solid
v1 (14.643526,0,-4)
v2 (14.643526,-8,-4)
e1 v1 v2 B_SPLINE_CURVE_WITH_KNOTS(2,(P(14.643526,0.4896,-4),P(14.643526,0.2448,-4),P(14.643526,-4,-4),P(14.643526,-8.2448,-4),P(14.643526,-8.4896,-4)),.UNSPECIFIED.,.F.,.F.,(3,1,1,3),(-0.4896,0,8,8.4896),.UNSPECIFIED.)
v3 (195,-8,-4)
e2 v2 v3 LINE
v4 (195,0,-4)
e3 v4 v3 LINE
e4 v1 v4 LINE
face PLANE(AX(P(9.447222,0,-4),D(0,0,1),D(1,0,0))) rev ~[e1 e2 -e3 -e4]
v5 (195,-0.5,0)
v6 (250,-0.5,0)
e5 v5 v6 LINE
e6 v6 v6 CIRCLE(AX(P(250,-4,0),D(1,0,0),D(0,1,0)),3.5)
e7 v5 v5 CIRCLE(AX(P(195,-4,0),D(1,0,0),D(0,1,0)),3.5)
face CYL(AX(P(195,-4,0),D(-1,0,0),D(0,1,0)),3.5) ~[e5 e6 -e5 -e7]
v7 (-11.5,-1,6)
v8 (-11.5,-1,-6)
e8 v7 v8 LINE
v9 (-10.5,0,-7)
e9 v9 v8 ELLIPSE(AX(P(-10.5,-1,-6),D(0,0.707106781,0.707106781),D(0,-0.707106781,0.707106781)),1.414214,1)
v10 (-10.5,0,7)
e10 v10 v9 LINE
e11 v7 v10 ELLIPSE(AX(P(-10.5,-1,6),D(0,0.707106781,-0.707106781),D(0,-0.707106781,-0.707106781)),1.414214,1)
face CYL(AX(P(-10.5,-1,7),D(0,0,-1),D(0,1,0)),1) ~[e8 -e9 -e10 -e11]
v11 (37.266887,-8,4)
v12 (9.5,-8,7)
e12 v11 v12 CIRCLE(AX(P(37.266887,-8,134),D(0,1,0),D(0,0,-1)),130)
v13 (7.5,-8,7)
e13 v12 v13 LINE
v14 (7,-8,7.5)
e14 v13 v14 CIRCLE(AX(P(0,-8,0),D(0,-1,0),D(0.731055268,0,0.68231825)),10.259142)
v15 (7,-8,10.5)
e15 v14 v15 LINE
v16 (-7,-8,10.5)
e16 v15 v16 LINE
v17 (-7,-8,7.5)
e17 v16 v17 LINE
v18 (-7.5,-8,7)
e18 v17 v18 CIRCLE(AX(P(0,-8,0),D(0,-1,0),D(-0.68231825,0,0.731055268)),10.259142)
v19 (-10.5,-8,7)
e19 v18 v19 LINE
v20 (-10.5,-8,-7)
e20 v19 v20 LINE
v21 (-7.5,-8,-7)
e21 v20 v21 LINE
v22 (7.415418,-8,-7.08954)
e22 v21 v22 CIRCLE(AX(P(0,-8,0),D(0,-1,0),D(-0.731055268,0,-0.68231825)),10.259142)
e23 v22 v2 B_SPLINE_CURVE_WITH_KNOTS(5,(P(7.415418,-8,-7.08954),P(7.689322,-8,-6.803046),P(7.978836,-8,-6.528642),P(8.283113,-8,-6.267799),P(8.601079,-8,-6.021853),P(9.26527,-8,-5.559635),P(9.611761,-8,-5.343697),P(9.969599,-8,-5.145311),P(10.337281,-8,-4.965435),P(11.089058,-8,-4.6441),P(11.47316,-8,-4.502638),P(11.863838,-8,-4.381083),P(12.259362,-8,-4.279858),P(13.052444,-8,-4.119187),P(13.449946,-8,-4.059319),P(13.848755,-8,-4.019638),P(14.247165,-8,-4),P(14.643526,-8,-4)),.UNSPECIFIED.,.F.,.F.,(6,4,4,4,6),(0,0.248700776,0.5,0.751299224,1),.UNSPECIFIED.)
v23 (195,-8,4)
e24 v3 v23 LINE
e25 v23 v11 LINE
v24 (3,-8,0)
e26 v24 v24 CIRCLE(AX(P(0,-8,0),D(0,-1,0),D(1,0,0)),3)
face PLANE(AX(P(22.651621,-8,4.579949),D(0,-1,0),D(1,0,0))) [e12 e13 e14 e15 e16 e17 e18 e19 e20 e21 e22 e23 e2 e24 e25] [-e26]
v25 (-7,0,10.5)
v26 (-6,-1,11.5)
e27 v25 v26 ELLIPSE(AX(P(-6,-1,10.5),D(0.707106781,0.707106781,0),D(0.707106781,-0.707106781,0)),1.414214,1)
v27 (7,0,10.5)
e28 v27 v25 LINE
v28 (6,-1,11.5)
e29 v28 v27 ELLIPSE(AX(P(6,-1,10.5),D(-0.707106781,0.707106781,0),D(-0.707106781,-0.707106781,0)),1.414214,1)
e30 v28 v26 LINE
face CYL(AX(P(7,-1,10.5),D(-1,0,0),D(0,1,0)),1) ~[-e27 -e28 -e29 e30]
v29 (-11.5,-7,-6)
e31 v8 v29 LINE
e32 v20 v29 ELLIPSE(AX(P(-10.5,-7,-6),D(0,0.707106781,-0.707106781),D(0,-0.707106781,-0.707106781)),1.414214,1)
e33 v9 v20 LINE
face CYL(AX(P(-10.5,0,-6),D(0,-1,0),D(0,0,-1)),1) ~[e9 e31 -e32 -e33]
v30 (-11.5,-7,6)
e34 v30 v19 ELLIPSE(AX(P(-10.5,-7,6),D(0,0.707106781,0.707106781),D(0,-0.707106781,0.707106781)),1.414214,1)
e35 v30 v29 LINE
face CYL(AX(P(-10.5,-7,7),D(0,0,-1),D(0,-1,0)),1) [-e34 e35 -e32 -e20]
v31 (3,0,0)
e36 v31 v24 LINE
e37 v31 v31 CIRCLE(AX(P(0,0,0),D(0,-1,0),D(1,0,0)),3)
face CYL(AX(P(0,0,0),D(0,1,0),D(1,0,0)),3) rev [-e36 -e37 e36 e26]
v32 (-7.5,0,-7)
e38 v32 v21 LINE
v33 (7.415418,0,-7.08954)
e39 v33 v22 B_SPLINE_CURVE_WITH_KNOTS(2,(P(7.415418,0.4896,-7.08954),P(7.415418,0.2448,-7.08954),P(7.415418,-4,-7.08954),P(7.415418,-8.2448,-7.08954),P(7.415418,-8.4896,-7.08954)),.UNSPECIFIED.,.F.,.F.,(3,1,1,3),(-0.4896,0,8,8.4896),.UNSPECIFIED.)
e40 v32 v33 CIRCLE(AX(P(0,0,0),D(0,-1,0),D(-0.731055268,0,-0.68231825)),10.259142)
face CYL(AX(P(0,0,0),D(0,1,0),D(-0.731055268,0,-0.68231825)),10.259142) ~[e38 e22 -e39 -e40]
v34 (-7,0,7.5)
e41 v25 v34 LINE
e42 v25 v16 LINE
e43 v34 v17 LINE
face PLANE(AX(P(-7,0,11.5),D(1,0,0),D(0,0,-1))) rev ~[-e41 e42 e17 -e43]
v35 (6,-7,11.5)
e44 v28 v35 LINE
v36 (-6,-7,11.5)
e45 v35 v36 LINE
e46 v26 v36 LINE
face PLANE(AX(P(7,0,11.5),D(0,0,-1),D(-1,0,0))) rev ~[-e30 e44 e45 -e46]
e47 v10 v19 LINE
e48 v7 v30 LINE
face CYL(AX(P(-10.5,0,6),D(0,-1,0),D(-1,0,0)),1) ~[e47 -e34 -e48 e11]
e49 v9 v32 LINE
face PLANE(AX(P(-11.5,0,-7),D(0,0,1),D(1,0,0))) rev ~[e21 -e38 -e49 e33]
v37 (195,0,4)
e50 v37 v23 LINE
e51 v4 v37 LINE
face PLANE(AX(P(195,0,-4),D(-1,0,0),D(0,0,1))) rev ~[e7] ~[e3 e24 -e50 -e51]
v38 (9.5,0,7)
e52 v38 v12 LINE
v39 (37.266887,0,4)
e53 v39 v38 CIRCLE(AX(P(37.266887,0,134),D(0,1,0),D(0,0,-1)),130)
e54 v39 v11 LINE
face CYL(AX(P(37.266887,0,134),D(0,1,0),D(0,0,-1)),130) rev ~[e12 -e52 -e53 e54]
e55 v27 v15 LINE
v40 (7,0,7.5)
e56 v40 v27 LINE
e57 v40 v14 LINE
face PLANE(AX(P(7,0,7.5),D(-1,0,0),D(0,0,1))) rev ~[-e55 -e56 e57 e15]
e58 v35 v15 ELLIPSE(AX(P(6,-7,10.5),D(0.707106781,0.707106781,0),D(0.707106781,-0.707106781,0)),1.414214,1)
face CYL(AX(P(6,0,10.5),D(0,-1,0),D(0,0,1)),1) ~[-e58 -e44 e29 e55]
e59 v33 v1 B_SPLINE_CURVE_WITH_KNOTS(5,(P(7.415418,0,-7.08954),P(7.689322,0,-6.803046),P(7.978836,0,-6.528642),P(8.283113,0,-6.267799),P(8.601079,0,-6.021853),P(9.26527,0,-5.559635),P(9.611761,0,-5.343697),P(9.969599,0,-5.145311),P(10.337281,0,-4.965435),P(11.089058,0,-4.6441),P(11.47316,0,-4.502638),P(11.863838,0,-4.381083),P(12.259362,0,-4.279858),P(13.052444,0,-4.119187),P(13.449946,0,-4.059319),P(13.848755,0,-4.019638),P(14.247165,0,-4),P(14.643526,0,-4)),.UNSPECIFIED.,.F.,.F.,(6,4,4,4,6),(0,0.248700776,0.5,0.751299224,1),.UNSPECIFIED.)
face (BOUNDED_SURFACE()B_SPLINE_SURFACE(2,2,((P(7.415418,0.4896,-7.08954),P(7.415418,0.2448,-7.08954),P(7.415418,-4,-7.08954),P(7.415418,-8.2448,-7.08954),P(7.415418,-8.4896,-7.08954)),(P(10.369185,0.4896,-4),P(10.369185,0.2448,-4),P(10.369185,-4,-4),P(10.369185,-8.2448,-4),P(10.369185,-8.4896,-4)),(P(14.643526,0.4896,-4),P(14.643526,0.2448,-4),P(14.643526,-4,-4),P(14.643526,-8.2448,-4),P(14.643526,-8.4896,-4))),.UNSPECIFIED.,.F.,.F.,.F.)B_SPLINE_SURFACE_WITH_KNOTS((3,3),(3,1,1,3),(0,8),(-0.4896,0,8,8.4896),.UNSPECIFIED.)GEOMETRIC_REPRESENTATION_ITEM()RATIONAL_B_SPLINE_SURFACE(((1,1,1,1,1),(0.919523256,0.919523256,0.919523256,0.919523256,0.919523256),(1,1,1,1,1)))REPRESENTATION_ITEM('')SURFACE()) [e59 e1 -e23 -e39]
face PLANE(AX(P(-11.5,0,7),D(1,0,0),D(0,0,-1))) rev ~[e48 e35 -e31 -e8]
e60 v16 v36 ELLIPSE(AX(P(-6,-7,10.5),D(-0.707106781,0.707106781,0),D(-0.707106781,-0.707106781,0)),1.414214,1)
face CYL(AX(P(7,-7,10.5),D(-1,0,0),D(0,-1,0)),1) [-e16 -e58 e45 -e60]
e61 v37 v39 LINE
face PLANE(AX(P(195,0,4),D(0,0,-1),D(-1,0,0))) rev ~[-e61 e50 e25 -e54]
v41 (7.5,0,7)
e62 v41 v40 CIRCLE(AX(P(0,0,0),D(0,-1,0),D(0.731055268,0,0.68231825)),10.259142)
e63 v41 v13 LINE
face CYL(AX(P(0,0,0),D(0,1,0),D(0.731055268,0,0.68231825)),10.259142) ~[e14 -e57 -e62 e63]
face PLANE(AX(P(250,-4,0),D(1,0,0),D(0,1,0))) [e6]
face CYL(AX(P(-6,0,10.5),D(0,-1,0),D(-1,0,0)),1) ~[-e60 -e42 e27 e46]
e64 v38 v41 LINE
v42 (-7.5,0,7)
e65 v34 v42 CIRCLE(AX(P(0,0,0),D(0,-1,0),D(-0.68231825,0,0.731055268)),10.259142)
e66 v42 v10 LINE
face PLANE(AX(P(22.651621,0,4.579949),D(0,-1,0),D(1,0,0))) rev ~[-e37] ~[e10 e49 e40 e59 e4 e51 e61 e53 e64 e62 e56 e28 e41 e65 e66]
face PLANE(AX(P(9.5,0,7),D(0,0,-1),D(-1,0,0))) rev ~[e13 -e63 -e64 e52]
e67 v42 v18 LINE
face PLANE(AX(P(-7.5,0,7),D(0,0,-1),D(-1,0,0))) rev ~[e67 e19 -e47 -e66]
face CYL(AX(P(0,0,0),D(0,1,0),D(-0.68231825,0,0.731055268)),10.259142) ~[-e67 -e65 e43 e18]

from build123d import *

# Parameters (mm, degrees)
F0_R        = 3
F1_DEPTH    = 8
F2_R        = 10
F3_T1_DEPTH = 8
F4_R        = 1
F5_R        = 3.5
F6_DEPTH    = 55


# Not quite as in the source:
# - a fillet or chamfer that OpenCascade refuses, or shapes differently, is made with other operations: its cross-section is extruded or revolved along the edge and cut away or added


with BuildPart() as f1:
    # F0 (on Front) → F1 (new body)
    with BuildSketch(Plane.XZ):
        with BuildLine():
            Line((-7.5, 7), (-11.5, 7))
            Line((-11.5, 7), (-11.5, -7))
            Line((-11.5, -7), (-7.5, -7))
            ThreePointArc((-7.5, -7), (0, -10.2591422643), (7.5, -7))
            ThreePointArc((7.5, -7), (8.6053519278, -5.5855096632), (9.4472218138, -4))
            Line((9.4472218138, -4), (9.5, -4))
            Line((9.5, -4), (195, -4))
            Line((195, -4), (195, 4))
            Line((195, 4), (9.5, 4))
            Line((9.5, 4), (9.5, 7))
            Line((9.5, 7), (7.5, 7))
            ThreePointArc((7.5, 7), (7.2543090643, 7.2543090643), (7, 7.5))
            Line((7, 7.5), (7, 11.5))
            Line((7, 11.5), (-7, 11.5))
            Line((-7, 11.5), (-7, 7.5))
            ThreePointArc((-7, 7.5), (-7.2543090643, 7.2543090643), (-7.5, 7))
        make_face()
        Circle(F0_R, mode=Mode.SUBTRACT)
    extrude(amount=F1_DEPTH)

    # F2
    f2_edges = [f1.edges().sort_by_distance(p)[0] for p in [
        (9.447222, -4, -4),
    ]]
    fillet(f2_edges, radius=F2_R)

    # F3: fillet of radius 130 on 1 edges, made by hand

    # F3_s2 → F3_t1 (join)
    with BuildSketch(Plane.XZ):
        with BuildLine():
            ThreePointArc((37.2668867538, 4), (23.3026467101, 4.7521760338), (9.5, 7))
            Line((9.5, 7), (9.5, 4))
            Line((9.5, 4), (37.2668867538, 4))
        make_face()
    extrude(amount=F3_T1_DEPTH)

    # F4
    f4_edges = [f1.edges().sort_by_distance(p)[0] for p in [
        (7, -4, 11.5),
        (-7, -4, 11.5),
        (0, 0, 11.5),
        (0, -8, 11.5),
        (-11.5, -4, 7),
        (-11.5, -4, -7),
        (-11.5, 0, 0),
        (-11.5, -8, 0),
    ]]
    fillet(f4_edges, radius=F4_R)

    # F5 (on face) → F6 (join)
    with BuildSketch(Plane.YZ.offset(195)):
        with Locations((-4, 0)):
            Circle(F5_R)
    extrude(amount=F6_DEPTH)


solid = f1.part
